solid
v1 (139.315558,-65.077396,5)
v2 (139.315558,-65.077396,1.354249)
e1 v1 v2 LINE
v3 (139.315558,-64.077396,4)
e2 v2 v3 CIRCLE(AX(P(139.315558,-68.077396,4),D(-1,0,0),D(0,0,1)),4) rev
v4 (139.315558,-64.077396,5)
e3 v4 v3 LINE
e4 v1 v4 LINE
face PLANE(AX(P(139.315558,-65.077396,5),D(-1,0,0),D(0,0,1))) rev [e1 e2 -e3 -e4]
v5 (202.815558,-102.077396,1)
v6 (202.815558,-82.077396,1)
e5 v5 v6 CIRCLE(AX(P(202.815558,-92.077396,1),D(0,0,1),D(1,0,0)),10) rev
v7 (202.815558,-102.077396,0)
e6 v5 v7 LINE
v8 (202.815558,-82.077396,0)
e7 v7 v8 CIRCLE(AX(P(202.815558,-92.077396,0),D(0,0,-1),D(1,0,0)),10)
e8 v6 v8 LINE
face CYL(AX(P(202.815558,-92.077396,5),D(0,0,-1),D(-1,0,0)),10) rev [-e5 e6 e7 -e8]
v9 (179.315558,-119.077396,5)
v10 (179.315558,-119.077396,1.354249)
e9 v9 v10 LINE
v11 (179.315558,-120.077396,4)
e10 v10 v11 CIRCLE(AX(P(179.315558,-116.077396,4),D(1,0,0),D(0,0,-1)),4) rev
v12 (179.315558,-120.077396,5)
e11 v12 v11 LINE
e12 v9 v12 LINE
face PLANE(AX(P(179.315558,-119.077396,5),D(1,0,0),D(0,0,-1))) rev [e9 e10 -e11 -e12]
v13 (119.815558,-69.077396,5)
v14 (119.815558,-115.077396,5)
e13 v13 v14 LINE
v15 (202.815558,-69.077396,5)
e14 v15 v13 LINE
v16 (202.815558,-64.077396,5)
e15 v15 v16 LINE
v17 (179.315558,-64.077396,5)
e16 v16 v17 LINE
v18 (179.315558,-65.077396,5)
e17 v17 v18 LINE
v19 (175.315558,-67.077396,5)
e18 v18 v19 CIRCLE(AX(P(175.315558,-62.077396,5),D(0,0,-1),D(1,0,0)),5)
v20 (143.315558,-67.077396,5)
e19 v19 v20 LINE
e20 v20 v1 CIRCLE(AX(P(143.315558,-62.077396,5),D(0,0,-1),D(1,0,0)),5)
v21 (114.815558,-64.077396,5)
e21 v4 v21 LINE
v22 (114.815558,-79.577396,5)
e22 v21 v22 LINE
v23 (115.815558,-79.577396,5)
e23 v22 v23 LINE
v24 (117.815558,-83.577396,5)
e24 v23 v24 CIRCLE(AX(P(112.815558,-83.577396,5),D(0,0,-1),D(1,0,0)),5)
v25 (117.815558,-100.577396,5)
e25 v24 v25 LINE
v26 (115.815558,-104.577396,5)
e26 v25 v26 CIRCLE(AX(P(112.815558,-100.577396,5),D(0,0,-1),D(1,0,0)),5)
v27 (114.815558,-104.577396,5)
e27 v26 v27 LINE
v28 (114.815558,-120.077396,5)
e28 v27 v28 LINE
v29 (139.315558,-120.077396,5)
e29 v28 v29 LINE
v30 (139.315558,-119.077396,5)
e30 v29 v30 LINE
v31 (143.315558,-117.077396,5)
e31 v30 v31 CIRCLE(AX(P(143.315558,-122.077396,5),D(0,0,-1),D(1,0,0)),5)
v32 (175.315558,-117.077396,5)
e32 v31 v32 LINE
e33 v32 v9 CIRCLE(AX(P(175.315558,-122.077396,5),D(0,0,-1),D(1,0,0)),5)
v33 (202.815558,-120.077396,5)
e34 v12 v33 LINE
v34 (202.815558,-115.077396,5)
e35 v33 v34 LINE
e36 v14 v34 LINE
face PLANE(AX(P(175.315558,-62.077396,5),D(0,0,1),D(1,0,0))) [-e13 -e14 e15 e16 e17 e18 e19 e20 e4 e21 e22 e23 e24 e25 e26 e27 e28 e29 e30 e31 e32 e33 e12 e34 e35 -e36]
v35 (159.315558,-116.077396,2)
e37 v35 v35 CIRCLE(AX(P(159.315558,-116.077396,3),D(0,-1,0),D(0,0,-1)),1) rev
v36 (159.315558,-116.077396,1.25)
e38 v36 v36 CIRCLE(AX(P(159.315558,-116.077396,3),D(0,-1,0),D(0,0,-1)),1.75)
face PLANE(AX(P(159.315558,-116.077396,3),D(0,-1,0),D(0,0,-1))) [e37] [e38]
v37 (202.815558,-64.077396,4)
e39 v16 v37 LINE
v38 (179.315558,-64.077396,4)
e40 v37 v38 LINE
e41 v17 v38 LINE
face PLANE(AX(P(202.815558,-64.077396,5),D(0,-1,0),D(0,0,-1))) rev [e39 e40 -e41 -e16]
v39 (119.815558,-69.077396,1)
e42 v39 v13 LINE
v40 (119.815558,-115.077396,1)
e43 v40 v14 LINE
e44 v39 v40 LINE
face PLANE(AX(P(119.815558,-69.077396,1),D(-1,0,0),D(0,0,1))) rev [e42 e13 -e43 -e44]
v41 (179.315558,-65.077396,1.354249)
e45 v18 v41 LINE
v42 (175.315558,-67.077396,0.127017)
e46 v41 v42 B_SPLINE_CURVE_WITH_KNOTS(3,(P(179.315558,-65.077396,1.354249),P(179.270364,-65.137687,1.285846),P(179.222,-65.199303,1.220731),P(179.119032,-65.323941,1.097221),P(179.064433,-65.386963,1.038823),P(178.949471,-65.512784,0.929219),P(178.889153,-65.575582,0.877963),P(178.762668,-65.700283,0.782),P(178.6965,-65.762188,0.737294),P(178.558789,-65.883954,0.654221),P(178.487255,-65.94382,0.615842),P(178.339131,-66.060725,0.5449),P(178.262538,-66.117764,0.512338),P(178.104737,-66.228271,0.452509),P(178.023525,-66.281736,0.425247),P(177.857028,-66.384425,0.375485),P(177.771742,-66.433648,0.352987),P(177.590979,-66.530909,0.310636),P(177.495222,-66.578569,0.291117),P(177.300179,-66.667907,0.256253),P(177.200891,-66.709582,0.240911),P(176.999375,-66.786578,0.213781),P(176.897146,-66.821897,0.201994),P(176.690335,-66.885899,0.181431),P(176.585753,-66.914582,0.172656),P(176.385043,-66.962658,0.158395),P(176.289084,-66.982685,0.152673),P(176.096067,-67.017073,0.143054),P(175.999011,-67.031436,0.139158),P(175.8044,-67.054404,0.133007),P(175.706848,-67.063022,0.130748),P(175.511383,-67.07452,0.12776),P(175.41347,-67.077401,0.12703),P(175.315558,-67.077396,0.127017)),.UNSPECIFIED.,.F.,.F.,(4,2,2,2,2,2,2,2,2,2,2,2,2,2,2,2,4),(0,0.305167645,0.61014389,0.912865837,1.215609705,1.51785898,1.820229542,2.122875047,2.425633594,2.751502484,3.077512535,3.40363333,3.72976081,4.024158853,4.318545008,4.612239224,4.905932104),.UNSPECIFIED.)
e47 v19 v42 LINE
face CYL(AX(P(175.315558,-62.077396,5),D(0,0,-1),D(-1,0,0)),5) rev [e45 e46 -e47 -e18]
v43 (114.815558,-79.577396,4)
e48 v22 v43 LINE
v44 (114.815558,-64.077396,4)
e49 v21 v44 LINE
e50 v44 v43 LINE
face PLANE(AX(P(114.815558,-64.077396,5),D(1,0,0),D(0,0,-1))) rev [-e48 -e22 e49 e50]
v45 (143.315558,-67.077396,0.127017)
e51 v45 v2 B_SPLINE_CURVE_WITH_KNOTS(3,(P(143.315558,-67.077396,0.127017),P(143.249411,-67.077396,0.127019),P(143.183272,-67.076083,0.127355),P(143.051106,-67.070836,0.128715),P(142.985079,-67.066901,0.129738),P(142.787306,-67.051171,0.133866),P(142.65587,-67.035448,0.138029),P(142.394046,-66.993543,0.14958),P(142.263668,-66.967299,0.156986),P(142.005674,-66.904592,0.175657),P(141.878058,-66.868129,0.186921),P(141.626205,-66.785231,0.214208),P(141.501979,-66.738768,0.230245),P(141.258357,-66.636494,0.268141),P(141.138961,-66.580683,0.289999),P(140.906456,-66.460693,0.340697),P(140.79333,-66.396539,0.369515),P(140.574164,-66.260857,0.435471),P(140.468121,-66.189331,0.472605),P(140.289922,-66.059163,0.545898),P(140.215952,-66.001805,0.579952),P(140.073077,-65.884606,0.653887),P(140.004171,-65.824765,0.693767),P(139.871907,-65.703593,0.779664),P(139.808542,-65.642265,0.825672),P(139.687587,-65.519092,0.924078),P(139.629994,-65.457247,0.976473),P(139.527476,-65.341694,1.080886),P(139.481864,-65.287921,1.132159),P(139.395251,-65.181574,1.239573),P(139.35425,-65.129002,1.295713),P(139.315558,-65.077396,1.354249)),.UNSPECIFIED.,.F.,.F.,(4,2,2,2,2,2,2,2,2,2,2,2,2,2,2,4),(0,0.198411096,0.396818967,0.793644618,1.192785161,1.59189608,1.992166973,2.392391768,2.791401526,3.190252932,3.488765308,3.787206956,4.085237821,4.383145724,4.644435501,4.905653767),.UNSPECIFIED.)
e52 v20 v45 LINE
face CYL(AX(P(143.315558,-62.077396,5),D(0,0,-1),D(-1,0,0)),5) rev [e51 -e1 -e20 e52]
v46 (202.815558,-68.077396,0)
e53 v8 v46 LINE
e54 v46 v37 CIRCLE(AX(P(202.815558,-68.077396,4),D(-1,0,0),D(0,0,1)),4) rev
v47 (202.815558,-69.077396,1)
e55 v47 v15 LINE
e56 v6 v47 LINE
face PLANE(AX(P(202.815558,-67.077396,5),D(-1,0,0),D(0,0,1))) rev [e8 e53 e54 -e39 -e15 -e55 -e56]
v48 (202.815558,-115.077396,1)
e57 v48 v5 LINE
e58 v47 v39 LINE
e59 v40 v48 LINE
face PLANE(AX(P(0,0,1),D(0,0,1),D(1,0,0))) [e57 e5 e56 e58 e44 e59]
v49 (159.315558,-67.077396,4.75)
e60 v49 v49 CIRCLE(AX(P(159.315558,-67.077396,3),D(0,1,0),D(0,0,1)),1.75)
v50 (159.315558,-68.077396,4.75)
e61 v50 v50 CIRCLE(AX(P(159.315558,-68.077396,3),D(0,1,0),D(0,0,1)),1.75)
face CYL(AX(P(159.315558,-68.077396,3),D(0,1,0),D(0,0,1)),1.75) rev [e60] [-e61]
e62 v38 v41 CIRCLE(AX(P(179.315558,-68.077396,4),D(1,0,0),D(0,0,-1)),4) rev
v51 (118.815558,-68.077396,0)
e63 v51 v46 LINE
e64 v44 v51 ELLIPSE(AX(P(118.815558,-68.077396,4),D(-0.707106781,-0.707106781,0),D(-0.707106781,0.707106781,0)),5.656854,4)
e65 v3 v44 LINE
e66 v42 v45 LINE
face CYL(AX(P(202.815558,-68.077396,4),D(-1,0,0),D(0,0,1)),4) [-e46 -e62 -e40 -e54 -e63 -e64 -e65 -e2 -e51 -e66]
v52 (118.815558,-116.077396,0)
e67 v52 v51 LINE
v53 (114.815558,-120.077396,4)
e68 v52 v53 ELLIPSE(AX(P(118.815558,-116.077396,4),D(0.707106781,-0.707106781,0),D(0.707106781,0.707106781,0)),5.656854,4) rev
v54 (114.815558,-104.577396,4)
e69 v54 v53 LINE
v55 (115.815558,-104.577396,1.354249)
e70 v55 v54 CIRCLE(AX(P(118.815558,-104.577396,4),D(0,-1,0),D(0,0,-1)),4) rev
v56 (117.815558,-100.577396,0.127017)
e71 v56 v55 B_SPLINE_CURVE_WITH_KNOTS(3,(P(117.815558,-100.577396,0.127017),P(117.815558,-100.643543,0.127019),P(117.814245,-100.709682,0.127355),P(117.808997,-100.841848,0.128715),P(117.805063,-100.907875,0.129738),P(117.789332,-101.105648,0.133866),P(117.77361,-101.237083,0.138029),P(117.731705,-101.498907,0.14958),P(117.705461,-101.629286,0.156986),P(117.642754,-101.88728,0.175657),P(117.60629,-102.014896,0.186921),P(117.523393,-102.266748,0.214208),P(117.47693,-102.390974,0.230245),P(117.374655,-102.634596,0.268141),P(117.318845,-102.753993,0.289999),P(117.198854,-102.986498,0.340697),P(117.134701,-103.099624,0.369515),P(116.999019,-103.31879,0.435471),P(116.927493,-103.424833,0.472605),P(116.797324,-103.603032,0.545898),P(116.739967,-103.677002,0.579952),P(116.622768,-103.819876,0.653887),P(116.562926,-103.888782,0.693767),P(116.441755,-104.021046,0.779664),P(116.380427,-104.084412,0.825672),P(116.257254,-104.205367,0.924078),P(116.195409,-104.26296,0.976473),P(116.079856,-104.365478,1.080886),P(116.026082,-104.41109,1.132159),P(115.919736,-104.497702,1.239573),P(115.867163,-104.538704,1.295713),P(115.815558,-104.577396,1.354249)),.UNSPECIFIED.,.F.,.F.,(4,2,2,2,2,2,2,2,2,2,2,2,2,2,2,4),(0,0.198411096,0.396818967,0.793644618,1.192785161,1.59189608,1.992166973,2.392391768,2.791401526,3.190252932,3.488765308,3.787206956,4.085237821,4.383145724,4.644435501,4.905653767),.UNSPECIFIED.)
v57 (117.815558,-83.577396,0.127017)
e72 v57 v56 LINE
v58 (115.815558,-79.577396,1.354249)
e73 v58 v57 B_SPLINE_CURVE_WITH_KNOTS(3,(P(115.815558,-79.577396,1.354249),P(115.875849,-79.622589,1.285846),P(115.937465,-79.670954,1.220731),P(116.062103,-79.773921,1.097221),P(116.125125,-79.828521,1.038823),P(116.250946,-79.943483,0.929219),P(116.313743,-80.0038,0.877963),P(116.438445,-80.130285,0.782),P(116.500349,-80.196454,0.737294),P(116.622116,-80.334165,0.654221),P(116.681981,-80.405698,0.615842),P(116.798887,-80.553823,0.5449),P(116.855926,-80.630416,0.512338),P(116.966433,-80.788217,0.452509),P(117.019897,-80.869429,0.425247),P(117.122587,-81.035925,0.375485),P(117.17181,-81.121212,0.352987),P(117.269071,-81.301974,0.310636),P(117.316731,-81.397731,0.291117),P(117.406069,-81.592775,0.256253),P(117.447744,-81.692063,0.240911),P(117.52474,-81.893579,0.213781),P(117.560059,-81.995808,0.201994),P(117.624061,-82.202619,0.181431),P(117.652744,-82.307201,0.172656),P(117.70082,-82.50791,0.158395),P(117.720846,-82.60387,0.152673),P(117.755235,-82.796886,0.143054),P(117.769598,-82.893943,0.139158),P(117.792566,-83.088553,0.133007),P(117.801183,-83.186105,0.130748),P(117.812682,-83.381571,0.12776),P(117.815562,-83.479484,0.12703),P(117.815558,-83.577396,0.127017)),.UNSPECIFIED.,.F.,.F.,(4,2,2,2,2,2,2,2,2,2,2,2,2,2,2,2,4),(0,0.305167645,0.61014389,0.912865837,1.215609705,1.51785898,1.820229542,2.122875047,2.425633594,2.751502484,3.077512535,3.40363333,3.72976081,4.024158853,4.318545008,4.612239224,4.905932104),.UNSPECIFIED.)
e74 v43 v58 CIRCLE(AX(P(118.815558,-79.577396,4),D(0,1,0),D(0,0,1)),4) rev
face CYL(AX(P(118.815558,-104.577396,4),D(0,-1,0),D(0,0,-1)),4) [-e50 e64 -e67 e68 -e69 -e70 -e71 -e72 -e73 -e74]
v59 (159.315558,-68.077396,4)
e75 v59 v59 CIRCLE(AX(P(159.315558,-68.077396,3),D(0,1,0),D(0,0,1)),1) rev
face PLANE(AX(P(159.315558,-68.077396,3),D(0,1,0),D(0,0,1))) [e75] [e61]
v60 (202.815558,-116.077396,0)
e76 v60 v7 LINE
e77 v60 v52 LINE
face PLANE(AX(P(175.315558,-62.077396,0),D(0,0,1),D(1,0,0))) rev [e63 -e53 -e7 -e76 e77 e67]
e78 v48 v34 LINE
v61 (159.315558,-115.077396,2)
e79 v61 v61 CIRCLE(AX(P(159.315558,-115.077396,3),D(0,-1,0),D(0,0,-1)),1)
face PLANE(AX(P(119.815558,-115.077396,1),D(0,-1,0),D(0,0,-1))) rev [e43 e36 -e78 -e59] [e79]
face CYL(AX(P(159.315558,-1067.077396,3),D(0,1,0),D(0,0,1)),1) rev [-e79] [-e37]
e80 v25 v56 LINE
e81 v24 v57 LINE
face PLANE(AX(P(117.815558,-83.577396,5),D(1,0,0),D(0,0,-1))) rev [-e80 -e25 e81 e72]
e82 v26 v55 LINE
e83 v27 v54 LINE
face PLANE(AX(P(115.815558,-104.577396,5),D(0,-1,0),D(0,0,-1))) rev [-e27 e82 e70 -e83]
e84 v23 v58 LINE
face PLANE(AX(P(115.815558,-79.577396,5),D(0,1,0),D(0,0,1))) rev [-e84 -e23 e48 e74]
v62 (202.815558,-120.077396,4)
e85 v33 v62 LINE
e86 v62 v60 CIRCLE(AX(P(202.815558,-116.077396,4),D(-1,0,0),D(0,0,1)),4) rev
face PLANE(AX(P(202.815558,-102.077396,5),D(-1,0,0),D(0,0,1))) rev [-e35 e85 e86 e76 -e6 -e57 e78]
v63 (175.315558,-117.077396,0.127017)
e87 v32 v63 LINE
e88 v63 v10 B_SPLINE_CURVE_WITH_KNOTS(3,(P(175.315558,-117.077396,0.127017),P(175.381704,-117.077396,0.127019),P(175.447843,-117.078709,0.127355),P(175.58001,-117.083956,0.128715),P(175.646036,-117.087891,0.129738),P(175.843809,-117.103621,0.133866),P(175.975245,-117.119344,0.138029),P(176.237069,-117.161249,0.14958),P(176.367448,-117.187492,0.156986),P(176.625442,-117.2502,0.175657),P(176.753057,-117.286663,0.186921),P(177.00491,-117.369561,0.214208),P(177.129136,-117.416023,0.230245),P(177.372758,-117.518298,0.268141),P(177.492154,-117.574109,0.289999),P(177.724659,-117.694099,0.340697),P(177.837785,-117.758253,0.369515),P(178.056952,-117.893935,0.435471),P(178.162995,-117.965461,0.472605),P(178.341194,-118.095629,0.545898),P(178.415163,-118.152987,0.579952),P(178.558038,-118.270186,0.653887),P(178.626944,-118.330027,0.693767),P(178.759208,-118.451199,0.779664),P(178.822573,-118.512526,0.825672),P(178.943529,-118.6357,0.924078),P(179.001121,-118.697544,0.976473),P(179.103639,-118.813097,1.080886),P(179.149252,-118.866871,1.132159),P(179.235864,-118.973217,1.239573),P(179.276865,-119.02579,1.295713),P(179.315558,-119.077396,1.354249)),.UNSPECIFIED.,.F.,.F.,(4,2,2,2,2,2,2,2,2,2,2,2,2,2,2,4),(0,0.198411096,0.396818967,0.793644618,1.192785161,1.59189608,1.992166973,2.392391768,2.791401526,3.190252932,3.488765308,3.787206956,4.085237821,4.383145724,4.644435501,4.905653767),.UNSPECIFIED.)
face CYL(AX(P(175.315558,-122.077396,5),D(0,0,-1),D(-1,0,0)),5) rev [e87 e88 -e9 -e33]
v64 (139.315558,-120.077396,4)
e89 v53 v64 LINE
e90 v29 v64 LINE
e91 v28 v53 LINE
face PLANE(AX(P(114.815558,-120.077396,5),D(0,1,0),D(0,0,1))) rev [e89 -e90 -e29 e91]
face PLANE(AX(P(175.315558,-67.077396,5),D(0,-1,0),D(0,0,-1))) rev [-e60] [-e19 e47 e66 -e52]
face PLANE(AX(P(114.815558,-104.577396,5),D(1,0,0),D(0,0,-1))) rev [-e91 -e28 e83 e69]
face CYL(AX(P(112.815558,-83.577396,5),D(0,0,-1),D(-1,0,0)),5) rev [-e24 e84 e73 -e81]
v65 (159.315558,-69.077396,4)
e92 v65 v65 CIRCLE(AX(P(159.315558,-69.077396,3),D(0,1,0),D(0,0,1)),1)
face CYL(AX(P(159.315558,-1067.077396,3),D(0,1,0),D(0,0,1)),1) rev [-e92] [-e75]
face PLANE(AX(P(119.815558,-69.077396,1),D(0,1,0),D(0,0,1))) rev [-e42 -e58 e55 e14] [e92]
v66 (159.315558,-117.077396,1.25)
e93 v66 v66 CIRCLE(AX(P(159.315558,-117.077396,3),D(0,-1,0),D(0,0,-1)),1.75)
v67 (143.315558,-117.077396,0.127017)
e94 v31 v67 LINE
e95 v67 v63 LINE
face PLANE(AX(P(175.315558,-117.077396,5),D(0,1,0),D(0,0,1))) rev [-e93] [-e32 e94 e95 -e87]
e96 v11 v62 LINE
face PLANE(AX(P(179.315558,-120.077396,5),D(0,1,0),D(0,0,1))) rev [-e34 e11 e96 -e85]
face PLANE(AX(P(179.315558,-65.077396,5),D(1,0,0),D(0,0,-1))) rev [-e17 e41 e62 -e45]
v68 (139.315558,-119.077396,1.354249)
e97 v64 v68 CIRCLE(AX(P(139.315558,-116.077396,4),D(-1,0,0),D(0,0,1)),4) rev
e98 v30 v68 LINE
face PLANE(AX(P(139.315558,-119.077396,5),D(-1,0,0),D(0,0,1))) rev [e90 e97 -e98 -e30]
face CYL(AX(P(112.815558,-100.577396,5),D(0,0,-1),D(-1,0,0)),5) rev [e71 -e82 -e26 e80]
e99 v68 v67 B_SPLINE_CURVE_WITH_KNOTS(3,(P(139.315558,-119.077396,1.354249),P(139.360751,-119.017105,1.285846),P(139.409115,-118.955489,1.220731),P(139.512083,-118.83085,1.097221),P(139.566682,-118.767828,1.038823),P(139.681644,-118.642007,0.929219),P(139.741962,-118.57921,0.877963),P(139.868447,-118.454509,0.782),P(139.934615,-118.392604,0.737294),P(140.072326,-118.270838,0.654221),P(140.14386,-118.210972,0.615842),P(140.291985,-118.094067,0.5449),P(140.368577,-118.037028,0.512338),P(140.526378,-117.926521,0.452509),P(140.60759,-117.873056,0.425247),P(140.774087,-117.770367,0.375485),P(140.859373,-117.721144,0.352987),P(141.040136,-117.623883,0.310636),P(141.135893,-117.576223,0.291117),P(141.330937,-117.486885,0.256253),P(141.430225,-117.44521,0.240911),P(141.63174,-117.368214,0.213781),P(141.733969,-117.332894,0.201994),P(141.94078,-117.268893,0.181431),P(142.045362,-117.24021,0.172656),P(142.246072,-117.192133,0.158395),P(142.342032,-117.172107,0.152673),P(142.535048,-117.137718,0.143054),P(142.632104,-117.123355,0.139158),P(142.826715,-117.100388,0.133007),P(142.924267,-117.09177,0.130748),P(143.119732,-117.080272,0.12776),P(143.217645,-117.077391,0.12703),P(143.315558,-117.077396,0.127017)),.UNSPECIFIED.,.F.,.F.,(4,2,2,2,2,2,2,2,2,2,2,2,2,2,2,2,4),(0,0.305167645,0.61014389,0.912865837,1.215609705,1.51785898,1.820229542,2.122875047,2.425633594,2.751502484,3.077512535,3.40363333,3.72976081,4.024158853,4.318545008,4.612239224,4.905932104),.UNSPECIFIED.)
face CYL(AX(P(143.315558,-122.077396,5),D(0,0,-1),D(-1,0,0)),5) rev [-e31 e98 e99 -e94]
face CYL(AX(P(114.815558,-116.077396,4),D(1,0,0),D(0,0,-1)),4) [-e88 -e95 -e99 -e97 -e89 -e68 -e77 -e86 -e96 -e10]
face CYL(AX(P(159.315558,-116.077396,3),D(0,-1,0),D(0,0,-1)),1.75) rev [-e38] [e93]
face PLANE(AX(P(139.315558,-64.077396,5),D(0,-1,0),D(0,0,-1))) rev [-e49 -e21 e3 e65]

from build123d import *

# Parameters (mm, degrees)
Y_KSEKLIK_EKSTR_ZYON1_DEPTH = 5
IZIM6_W                     = 83
IZIM6_H                     = 46
KES_EKSTR_ZYON2_DEPTH       = 4
RADYUS1_R                   = 4
IZIM7_R                     = 1
KES_EKSTR_ZYON3_DEPTH       = 1000
IZIM9_R                     = 1.75
KES_EKSTR_ZYON5_DEPTH       = 1
KES_EKSTR_ZYON6_START       = -1
IZIM10_R                    = 1.75
KES_EKSTR_ZYON6_DEPTH       = 1


with BuildPart() as part:
    # Çizim4 → Yükseklik-Ekstrüzyon1 (new body)
    with BuildSketch(Plane.XY):
        with BuildLine():
            Line((202.815557626, -67.077395959), (202.815557626, -82.077395959))
            ThreePointArc((202.815557626, -82.077395959), (192.815557626, -92.077395959), (202.815557626, -102.077395959))
            Line((202.815557626, -102.077395959), (202.815557626, -117.077395959))
            Line((202.815557626, -117.077395959), (202.815557626, -120.077395959))
            Line((202.815557626, -120.077395959), (179.315557626, -120.077395959))
            Line((179.315557626, -120.077395959), (179.315557626, -119.077395959))
            ThreePointArc((179.315557626, -119.077395959), (177.551625603, -117.605260004), (175.315557626, -117.077395959))
            Line((175.315557626, -117.077395959), (143.315557626, -117.077395959))
            ThreePointArc((143.315557626, -117.077395959), (141.079489648, -117.605260004), (139.315557626, -119.077395959))
            Line((139.315557626, -119.077395959), (139.315557626, -120.077395959))
            Line((139.315557626, -120.077395959), (114.815557626, -120.077395959))
            Line((114.815557626, -120.077395959), (114.815557626, -104.577395959))
            Line((114.815557626, -104.577395959), (115.815557626, -104.577395959))
            ThreePointArc((115.815557626, -104.577395959), (117.287693581, -102.813463937), (117.815557626, -100.577395959))
            Line((117.815557626, -100.577395959), (117.815557626, -83.577395959))
            ThreePointArc((117.815557626, -83.577395959), (117.287693581, -81.341327982), (115.815557626, -79.577395959))
            Line((115.815557626, -79.577395959), (114.815557626, -79.577395959))
            Line((114.815557626, -79.577395959), (114.815557626, -64.077395959))
            Line((114.815557626, -64.077395959), (139.315557626, -64.077395959))
            Line((139.315557626, -64.077395959), (139.315557626, -65.077395959))
            ThreePointArc((139.315557626, -65.077395959), (141.079489648, -66.549531914), (143.315557626, -67.077395959))
            Line((143.315557626, -67.077395959), (175.315557626, -67.077395959))
            ThreePointArc((175.315557626, -67.077395959), (177.551625603, -66.549531914), (179.315557626, -65.077395959))
            Line((179.315557626, -65.077395959), (179.315557626, -64.077395959))
            Line((179.315557626, -64.077395959), (202.815557626, -64.077395959))
            Line((202.815557626, -64.077395959), (202.815557626, -67.077395959))
        make_face()
    extrude(amount=Y_KSEKLIK_EKSTR_ZYON1_DEPTH)

    # Çizim6 → Kes-Ekstrüzyon2 (cut)
    with BuildSketch(Plane.XY.offset(5)):
        with Locations((161.315557626, -92.077395959)):
            Rectangle(IZIM6_W, IZIM6_H)
    extrude(amount=-KES_EKSTR_ZYON2_DEPTH, mode=Mode.SUBTRACT)

    # Radyus1
    # the kernel refuses this fillet: 4 mm, written as the material it takes off along each edge
    with BuildSketch(Plane(origin=(155.315557626, -64.077395959, 0), x_dir=(0, -1, 0), z_dir=(1, 0, 0)), Plane(origin=(226.815557626, -120.077395959, 0), x_dir=(0, 1, 0), z_dir=(-1, 0, 0))) as radyus1_piece_1:
        with BuildLine():
            CenterArc((RADYUS1_R, -RADYUS1_R), RADYUS1_R, 90, 90)
            Line((0, -RADYUS1_R), (-RADYUS1_R * 0.02, -RADYUS1_R))
            Line((-RADYUS1_R * 0.02, -RADYUS1_R), (-RADYUS1_R * 0.02, RADYUS1_R * 0.02))
            Line((-RADYUS1_R * 0.02, RADYUS1_R * 0.02), (RADYUS1_R, RADYUS1_R * 0.02))
            Line((RADYUS1_R, RADYUS1_R * 0.02), (RADYUS1_R, 0))
        make_face()
    extrude(amount=71.5, mode=Mode.SUBTRACT)
    with BuildSketch(Plane(origin=(163.315557626, -120.077395959, 0), x_dir=(0, 1, 0), z_dir=(-1, 0, 0)), Plane(origin=(90.815557626, -64.077395959, 0), x_dir=(0, -1, 0), z_dir=(1, 0, 0))) as radyus1_piece_2:
        with BuildLine():
            CenterArc((RADYUS1_R, -RADYUS1_R), RADYUS1_R, 90, 90)
            Line((0, -RADYUS1_R), (-RADYUS1_R * 0.02, -RADYUS1_R))
            Line((-RADYUS1_R * 0.02, -RADYUS1_R), (-RADYUS1_R * 0.02, RADYUS1_R * 0.02))
            Line((-RADYUS1_R * 0.02, RADYUS1_R * 0.02), (RADYUS1_R, RADYUS1_R * 0.02))
            Line((RADYUS1_R, RADYUS1_R * 0.02), (RADYUS1_R, 0))
        make_face()
    extrude(amount=72.5, mode=Mode.SUBTRACT)
    with BuildSketch(Plane(origin=(114.815557626, -144.077395959, 0), x_dir=(1, 0, 0), z_dir=(0, 1, 0)), Plane(origin=(114.815557626, -103.577395959, 0), x_dir=(1, 0, 0), z_dir=(0, 1, 0))) as radyus1_piece_3:
        with BuildLine():
            CenterArc((RADYUS1_R, -RADYUS1_R), RADYUS1_R, 90, 90)
            Line((0, -RADYUS1_R), (-RADYUS1_R * 0.02, -RADYUS1_R))
            Line((-RADYUS1_R * 0.02, -RADYUS1_R), (-RADYUS1_R * 0.02, RADYUS1_R * 0.02))
            Line((-RADYUS1_R * 0.02, RADYUS1_R * 0.02), (RADYUS1_R, RADYUS1_R * 0.02))
            Line((RADYUS1_R, RADYUS1_R * 0.02), (RADYUS1_R, 0))
        make_face()
    extrude(amount=63.5, mode=Mode.SUBTRACT)

    # Çizim7 → Kes-Ekstrüzyon3 (cut)
    with BuildSketch(Plane(origin=(0, -67.077395959, 0), x_dir=(1, 0, 0), z_dir=(0, 1, 0))):
        with Locations(Location((159.315557626, -3, 0), (0, 0, 270))):
            Circle(IZIM7_R)
    extrude(amount=-KES_EKSTR_ZYON3_DEPTH, mode=Mode.SUBTRACT)

    # Çizim9 → Kes-Ekstrüzyon5 (cut)
    with BuildSketch(Plane(origin=(0, -117.077395959, 0), x_dir=(-1, 0, 0), z_dir=(0, -1, 0))):
        with Locations(Location((-159.315557626, -3, 0), (0, 0, 90))):
            Circle(IZIM9_R)
    extrude(amount=-KES_EKSTR_ZYON5_DEPTH, mode=Mode.SUBTRACT)

    # Çizim10 → Kes-Ekstrüzyon6 (cut)
    with BuildSketch(Plane(origin=(0, -67.077395959, 0), x_dir=(1, 0, 0), z_dir=(0, 1, 0)).offset(KES_EKSTR_ZYON6_START)):
        with Locations(Location((159.315557626, -3, 0), (0, 0, 90))):
            Circle(IZIM10_R)
    extrude(amount=KES_EKSTR_ZYON6_DEPTH, mode=Mode.SUBTRACT)


solid = part.part
